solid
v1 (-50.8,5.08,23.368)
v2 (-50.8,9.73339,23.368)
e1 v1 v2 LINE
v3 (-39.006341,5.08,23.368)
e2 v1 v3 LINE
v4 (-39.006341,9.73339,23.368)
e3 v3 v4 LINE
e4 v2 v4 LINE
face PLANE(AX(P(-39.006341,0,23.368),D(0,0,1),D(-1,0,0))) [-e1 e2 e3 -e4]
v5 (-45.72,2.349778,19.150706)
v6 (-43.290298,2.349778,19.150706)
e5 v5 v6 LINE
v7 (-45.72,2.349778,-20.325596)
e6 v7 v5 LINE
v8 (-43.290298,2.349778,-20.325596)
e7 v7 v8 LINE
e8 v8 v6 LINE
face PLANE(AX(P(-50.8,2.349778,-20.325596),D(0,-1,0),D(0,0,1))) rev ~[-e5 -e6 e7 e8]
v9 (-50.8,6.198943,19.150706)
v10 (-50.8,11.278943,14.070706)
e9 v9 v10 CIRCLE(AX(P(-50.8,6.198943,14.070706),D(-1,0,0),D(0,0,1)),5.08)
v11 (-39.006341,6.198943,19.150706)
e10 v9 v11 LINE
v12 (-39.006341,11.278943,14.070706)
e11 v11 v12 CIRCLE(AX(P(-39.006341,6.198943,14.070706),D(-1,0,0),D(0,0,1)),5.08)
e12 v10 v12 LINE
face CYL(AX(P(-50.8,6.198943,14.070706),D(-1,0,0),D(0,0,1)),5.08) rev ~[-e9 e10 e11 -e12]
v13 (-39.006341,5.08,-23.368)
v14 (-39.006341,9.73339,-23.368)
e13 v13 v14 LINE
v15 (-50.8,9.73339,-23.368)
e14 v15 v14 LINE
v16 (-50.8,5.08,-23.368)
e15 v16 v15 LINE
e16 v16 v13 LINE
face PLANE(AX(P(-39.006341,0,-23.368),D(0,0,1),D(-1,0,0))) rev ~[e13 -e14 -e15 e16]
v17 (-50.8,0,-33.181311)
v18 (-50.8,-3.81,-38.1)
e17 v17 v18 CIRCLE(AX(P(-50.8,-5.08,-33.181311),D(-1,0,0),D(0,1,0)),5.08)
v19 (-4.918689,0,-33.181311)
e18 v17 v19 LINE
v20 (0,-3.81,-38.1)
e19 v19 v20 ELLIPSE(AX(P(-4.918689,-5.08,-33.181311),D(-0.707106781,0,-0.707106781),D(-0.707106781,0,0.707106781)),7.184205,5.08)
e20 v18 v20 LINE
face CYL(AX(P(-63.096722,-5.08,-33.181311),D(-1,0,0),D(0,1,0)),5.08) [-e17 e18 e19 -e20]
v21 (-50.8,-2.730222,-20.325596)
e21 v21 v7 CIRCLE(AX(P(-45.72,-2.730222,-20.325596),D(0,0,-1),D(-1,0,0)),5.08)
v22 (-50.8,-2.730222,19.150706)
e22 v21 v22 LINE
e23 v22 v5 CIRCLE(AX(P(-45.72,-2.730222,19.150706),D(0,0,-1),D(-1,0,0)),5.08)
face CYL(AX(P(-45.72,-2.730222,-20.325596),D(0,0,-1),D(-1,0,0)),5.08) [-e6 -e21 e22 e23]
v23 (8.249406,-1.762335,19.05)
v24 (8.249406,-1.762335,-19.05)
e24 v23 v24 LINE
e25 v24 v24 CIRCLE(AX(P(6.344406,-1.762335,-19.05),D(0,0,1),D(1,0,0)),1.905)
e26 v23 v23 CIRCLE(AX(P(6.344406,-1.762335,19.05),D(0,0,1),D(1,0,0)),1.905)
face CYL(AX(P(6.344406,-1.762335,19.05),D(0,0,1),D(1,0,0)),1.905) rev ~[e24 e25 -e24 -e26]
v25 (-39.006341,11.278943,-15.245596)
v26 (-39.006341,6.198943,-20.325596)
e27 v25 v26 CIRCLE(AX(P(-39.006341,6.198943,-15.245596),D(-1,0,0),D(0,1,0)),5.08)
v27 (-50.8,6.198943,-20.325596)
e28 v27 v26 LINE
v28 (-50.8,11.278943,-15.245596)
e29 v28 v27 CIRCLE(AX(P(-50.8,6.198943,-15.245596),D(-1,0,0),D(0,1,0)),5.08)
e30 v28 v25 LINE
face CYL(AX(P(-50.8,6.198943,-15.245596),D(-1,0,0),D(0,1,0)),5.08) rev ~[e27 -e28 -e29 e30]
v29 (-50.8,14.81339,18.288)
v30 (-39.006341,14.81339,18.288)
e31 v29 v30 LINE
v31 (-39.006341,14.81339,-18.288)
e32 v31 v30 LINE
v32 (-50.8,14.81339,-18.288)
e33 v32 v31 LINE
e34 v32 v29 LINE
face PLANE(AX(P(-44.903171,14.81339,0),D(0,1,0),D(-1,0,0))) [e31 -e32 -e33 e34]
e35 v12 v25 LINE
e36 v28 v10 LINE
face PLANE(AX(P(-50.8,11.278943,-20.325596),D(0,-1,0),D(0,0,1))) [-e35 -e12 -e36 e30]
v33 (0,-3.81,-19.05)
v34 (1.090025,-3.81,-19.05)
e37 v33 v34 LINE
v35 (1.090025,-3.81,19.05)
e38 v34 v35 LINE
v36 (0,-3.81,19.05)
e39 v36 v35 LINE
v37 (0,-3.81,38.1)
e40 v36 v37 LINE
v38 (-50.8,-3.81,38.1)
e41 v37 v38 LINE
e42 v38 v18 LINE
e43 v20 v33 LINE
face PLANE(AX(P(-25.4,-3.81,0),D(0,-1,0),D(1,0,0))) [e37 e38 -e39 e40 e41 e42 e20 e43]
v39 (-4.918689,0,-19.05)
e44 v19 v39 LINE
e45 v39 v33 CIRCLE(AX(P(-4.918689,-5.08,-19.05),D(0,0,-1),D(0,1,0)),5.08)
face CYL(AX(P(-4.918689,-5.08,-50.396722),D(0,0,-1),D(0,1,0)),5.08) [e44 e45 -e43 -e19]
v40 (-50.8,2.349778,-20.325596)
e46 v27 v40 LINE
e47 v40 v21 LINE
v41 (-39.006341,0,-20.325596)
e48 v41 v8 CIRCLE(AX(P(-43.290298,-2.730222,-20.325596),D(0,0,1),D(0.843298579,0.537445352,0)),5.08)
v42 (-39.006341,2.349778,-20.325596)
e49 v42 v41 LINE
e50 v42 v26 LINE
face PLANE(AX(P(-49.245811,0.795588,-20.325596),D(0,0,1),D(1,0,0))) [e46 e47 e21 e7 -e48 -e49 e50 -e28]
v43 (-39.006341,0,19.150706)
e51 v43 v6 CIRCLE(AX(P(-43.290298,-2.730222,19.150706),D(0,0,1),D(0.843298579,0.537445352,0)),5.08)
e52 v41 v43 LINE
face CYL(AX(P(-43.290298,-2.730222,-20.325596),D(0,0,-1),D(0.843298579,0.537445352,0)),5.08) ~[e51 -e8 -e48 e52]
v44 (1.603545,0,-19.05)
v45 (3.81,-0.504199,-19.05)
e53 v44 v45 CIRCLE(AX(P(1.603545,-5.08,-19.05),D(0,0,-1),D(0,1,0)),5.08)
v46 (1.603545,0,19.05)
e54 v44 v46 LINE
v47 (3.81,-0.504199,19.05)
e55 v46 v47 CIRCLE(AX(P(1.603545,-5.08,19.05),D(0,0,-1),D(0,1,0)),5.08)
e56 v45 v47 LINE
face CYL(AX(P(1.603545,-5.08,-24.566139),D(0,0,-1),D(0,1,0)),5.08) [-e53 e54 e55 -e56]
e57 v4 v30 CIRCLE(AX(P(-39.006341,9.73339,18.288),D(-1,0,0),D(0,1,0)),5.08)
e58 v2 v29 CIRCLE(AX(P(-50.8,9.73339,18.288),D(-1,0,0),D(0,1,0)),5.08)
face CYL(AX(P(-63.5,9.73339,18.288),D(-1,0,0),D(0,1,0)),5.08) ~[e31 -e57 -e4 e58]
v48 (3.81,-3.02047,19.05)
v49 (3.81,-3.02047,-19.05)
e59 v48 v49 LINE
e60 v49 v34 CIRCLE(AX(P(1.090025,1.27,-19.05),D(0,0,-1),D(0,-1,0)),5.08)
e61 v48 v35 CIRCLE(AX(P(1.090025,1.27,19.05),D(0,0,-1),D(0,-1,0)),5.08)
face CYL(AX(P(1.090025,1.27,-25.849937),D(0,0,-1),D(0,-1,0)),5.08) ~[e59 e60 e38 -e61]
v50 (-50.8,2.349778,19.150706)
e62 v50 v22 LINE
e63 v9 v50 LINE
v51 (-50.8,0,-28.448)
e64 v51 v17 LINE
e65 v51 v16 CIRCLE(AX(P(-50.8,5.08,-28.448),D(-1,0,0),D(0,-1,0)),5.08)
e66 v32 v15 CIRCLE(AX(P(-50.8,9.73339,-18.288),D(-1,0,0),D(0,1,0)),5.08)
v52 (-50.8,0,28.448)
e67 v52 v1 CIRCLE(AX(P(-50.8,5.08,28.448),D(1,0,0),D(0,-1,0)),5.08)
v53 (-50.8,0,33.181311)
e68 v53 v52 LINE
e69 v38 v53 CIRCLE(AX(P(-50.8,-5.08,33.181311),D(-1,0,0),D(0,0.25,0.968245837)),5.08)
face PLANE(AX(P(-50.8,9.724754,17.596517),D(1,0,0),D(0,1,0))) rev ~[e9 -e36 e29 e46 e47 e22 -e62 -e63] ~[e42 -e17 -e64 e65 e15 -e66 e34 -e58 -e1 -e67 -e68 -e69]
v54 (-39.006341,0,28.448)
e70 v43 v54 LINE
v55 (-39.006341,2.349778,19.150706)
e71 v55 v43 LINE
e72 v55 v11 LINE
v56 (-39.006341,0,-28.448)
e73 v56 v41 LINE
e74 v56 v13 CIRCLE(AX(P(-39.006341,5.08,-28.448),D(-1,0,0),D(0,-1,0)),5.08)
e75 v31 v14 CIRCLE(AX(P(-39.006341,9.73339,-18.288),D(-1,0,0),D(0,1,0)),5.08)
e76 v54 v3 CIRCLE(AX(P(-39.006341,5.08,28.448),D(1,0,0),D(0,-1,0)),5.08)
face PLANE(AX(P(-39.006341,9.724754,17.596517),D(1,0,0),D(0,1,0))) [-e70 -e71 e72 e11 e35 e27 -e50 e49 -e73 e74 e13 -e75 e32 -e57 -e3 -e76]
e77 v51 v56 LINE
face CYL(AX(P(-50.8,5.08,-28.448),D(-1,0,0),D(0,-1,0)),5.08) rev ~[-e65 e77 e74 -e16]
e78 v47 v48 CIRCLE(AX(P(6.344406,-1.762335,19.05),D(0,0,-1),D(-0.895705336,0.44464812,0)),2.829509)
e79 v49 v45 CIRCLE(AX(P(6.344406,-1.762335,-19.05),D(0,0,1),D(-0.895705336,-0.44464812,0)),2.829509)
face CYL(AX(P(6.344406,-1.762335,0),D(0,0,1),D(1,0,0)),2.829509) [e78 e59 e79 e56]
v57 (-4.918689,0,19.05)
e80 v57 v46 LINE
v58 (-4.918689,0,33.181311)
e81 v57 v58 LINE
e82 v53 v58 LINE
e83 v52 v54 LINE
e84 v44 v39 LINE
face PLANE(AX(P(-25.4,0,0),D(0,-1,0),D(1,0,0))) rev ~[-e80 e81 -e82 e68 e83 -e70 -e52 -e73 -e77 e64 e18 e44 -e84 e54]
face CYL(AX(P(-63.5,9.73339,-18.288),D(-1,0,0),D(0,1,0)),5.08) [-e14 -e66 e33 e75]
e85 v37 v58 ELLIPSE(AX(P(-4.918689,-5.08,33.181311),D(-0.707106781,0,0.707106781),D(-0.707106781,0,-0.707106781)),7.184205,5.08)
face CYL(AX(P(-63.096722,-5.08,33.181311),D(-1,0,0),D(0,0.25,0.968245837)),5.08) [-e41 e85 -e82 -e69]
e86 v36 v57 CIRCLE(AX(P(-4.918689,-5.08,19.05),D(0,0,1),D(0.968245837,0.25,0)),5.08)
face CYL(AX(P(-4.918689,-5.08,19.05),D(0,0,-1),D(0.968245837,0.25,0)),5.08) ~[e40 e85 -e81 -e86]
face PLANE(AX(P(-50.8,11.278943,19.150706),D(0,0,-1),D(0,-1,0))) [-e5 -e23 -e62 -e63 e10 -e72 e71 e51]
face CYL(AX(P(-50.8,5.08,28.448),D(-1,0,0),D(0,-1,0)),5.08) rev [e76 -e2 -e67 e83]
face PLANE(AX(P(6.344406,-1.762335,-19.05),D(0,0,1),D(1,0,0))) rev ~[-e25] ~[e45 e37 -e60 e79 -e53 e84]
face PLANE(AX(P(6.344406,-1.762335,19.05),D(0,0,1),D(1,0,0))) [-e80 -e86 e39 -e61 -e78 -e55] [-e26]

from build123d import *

# Parameters (mm, degrees)
F0_W          = 3.81
F0_H          = 38.1
F1_DEPTH      = 3.81
F2_R          = 2.8295085799
F3_DEPTH      = 19.05
F3_DEPTH_BACK = 19.05
F4_R          = 1.905
F5_DEPTH      = 47.01882
F6_W          = 11.7936587512
F6_H          = 46.736
F7_DEPTH      = 14.81339
F8_W          = 8.9291655459
F8_H          = 39.4763015211
F9_DEPTH      = 25.4
F10_T1_DEPTH  = 11.7936587512
F10_T3_DEPTH  = 11.7936587512
F10_T5_DEPTH  = 11.7936587512
F10_T7_DEPTH  = 11.7936587512
F10_T9_DEPTH  = 39.4763015211
F10_T11_DEPTH = 37.1936587512
F10_T13_DEPTH = 37.1936587512
F10_T15_DEPTH = 39.4763015211
F11_T1_DEPTH  = 75.3934442484
F11_T3_DEPTH  = 31.3467221242
F11_T5_DEPTH  = 31.3467221242
F11_T7_DEPTH  = 49.1322772947
F11_T9_DEPTH  = 51.6998748204


# Not quite as in the source:
# - a fillet or chamfer that OpenCascade refuses, or shapes differently, is made with other operations: its cross-section is extruded or revolved along the edge and cut away or added


with BuildPart() as f1:
    # F0 (on Front) → F1 (new body)
    with BuildSketch(Plane.XZ):
        Polygon((0, 38.1), (-50.8, 38.1), (-50.8, -38.1), (0, -38.1), (0, -19.05), (0, 19.05), align=None)
        with Locations((1.905, 0)):
            Rectangle(F0_W, F0_H)
    extrude(amount=F1_DEPTH)

    # F2 (on Top) → F3 (join, two sides)
    with BuildSketch(Plane.XY) as f3_sk:
        with Locations((6.3444059342, -1.762334723)):
            Circle(F2_R)
    extrude(amount=F3_DEPTH)
    extrude(f3_sk.sketch, amount=-F3_DEPTH_BACK)

    # F4 (on face) → F5 (cut)
    with BuildSketch(Plane.XY.offset(19.05)):
        with Locations((6.3444059342, -1.762334723)):
            Circle(F4_R)
    extrude(amount=-F5_DEPTH, mode=Mode.SUBTRACT)

    # F6 (on face) → F7 (join)
    with BuildSketch(Plane(origin=(0, 0, 0), x_dir=(-1, 0, 0), z_dir=(0, 1, 0))):
        with Locations((44.9031706244, 0)):
            Rectangle(F6_W, F6_H)
    extrude(amount=F7_DEPTH)

    # F8 (on face) → F9 (cut)
    with BuildSketch(Plane(origin=(-50.8, 0, 0), x_dir=(0, -1, 0), z_dir=(-1, 0, 0))):
        with Locations((-6.8143603858, -0.5874447525)):
            Rectangle(F8_W, F8_H)
    extrude(amount=-F9_DEPTH, mode=Mode.SUBTRACT)

    # F10: fillet of radius 5.08 on 8 edges, made by hand

    # F10_s2 → F10_t1 (join)
    with BuildSketch(Plane.YZ.offset(-50.8)):
        with BuildLine():
            ThreePointArc((0, -28.448), (1.4878975516, -24.8558975516), (5.08, -23.368))
            Line((5.08, -23.368), (0, -23.368))
            Line((0, -23.368), (0, -28.448))
        make_face()
    extrude(amount=F10_T1_DEPTH)

    # F10_s4 → F10_t3 (join)
    with BuildSketch(Plane.YZ.offset(-50.8)):
        with BuildLine():
            ThreePointArc((0, 28.448), (1.4878975516, 24.8558975516), (5.08, 23.368))
            Line((5.08, 23.368), (0, 23.368))
            Line((0, 23.368), (0, 28.448))
        make_face()
    extrude(amount=F10_T3_DEPTH)

    # F10_s6 → F10_t5 (join)
    with BuildSketch(Plane.YZ.offset(-50.8)):
        with BuildLine():
            ThreePointArc((11.2789431587, -15.245595513), (9.7910456071, -18.8376979614), (6.1989431587, -20.325595513))
            Line((6.1989431587, -20.325595513), (11.2789431587, -20.325595513))
            Line((11.2789431587, -20.325595513), (11.2789431587, -15.245595513))
        make_face()
    extrude(amount=F10_T5_DEPTH)

    # F10_s8 → F10_t7 (join)
    with BuildSketch(Plane.YZ.offset(-50.8)):
        with BuildLine():
            ThreePointArc((6.1989431587, 19.1507060081), (9.7910456071, 17.6628084565), (11.2789431587, 14.0707060081))
            Line((11.2789431587, 14.0707060081), (11.2789431587, 19.1507060081))
            Line((11.2789431587, 19.1507060081), (6.1989431587, 19.1507060081))
        make_face()
    extrude(amount=F10_T7_DEPTH)

    # F10_s10 → F10_t9 (cut)
    with BuildSketch(Plane.XY.offset(-20.325595513)):
        with BuildLine():
            ThreePointArc((-50.8, -2.7302223872), (-49.3121024484, 0.8618800613), (-45.72, 2.3497776128))
            Line((-45.72, 2.3497776128), (-50.8, 2.3497776128))
            Line((-50.8, 2.3497776128), (-50.8, -2.7302223872))
        make_face()
    extrude(amount=F10_T9_DEPTH, mode=Mode.SUBTRACT)

    # F10_s12 → F10_t11 (cut)
    with BuildSketch(Plane.YZ.offset(-63.5)):
        with BuildLine():
            ThreePointArc((14.81339, 18.288), (13.3254924484, 21.8801024484), (9.73339, 23.368))
            Line((9.73339, 23.368), (14.81339, 23.368))
            Line((14.81339, 23.368), (14.81339, 18.288))
        make_face()
    extrude(amount=F10_T11_DEPTH, mode=Mode.SUBTRACT)

    # F10_s14 → F10_t13 (cut)
    with BuildSketch(Plane.YZ.offset(-63.5)):
        with BuildLine():
            ThreePointArc((14.81339, -18.288), (13.3254924484, -21.8801024484), (9.73339, -23.368))
            Line((9.73339, -23.368), (14.81339, -23.368))
            Line((14.81339, -23.368), (14.81339, -18.288))
        make_face()
    extrude(amount=F10_T13_DEPTH, mode=Mode.SUBTRACT)

    # F10_s16 → F10_t15 (cut)
    with BuildSketch(Plane.XY.offset(-20.325595513)):
        with BuildLine():
            ThreePointArc((-39.0063412488, 0), (-40.8472599359, 1.7237606464), (-43.2902980315, 2.3497776128))
            Line((-43.2902980315, 2.3497776128), (-39.0063412488, 2.3497776128))
            Line((-39.0063412488, 2.3497776128), (-39.0063412488, 0))
        make_face()
    extrude(amount=F10_T15_DEPTH, mode=Mode.SUBTRACT)

    # F11: fillet of radius 5.08 on 6 edges, made by hand

    # F11_s2 → F11_t1 (cut)
    with BuildSketch(Plane.YZ.offset(-63.0967221242)):
        with BuildLine():
            ThreePointArc((0, -33.1813111503), (-1.0639073716, -36.2921631237), (-3.81, -38.1))
            Line((-3.81, -38.1), (0, -38.1))
            Line((0, -38.1), (0, -33.1813111503))
        make_face()
        with BuildLine():
            ThreePointArc((-3.81, 38.1), (-1.0639073716, 36.2921631237), (0, 33.1813111503))
            Line((0, 33.1813111503), (0, 38.1))
            Line((0, 38.1), (-3.81, 38.1))
        make_face()
    extrude(amount=F11_T1_DEPTH, mode=Mode.SUBTRACT)

    # F11_s4 → F11_t3 (cut)
    with BuildSketch(Plane.XY.offset(19.05)):
        with BuildLine():
            ThreePointArc((0, -3.81), (-1.8078368763, -1.0639073716), (-4.9186888497, 0))
            Line((-4.9186888497, 0), (0, 0))
            Line((0, 0), (0, -3.81))
        make_face()
    extrude(amount=F11_T3_DEPTH, mode=Mode.SUBTRACT)

    # F11_s6 → F11_t5 (cut)
    with BuildSketch(Plane.XY.offset(-50.3967221242)):
        with BuildLine():
            ThreePointArc((-4.9186888497, 0), (-1.8078368763, -1.0639073716), (0, -3.81))
            Line((0, -3.81), (0, 0))
            Line((0, 0), (-4.9186888497, 0))
        make_face()
    extrude(amount=F11_T5_DEPTH, mode=Mode.SUBTRACT)

    # F11_s8 → F11_t7 (cut)
    with BuildSketch(Plane.XY.offset(-24.5661386473)):
        with BuildLine():
            ThreePointArc((1.6035445411, 0), (2.7352095066, -0.1276536464), (3.81, -0.5041990529))
            Line((3.81, -0.5041990529), (3.81, 0))
            Line((3.81, 0), (1.6035445411, 0))
        make_face()
    extrude(amount=F11_T7_DEPTH, mode=Mode.SUBTRACT)

    # F11_s10 → F11_t9 (cut)
    with BuildSketch(Plane.XY.offset(-25.8499374102)):
        with BuildLine():
            ThreePointArc((1.0900250359, -3.81), (2.5061483361, -3.6086263229), (3.81, -3.0204703932))
            Line((3.81, -3.0204703932), (3.81, -3.81))
            Line((3.81, -3.81), (1.0900250359, -3.81))
        make_face()
    extrude(amount=F11_T9_DEPTH, mode=Mode.SUBTRACT)


solid = f1.part
